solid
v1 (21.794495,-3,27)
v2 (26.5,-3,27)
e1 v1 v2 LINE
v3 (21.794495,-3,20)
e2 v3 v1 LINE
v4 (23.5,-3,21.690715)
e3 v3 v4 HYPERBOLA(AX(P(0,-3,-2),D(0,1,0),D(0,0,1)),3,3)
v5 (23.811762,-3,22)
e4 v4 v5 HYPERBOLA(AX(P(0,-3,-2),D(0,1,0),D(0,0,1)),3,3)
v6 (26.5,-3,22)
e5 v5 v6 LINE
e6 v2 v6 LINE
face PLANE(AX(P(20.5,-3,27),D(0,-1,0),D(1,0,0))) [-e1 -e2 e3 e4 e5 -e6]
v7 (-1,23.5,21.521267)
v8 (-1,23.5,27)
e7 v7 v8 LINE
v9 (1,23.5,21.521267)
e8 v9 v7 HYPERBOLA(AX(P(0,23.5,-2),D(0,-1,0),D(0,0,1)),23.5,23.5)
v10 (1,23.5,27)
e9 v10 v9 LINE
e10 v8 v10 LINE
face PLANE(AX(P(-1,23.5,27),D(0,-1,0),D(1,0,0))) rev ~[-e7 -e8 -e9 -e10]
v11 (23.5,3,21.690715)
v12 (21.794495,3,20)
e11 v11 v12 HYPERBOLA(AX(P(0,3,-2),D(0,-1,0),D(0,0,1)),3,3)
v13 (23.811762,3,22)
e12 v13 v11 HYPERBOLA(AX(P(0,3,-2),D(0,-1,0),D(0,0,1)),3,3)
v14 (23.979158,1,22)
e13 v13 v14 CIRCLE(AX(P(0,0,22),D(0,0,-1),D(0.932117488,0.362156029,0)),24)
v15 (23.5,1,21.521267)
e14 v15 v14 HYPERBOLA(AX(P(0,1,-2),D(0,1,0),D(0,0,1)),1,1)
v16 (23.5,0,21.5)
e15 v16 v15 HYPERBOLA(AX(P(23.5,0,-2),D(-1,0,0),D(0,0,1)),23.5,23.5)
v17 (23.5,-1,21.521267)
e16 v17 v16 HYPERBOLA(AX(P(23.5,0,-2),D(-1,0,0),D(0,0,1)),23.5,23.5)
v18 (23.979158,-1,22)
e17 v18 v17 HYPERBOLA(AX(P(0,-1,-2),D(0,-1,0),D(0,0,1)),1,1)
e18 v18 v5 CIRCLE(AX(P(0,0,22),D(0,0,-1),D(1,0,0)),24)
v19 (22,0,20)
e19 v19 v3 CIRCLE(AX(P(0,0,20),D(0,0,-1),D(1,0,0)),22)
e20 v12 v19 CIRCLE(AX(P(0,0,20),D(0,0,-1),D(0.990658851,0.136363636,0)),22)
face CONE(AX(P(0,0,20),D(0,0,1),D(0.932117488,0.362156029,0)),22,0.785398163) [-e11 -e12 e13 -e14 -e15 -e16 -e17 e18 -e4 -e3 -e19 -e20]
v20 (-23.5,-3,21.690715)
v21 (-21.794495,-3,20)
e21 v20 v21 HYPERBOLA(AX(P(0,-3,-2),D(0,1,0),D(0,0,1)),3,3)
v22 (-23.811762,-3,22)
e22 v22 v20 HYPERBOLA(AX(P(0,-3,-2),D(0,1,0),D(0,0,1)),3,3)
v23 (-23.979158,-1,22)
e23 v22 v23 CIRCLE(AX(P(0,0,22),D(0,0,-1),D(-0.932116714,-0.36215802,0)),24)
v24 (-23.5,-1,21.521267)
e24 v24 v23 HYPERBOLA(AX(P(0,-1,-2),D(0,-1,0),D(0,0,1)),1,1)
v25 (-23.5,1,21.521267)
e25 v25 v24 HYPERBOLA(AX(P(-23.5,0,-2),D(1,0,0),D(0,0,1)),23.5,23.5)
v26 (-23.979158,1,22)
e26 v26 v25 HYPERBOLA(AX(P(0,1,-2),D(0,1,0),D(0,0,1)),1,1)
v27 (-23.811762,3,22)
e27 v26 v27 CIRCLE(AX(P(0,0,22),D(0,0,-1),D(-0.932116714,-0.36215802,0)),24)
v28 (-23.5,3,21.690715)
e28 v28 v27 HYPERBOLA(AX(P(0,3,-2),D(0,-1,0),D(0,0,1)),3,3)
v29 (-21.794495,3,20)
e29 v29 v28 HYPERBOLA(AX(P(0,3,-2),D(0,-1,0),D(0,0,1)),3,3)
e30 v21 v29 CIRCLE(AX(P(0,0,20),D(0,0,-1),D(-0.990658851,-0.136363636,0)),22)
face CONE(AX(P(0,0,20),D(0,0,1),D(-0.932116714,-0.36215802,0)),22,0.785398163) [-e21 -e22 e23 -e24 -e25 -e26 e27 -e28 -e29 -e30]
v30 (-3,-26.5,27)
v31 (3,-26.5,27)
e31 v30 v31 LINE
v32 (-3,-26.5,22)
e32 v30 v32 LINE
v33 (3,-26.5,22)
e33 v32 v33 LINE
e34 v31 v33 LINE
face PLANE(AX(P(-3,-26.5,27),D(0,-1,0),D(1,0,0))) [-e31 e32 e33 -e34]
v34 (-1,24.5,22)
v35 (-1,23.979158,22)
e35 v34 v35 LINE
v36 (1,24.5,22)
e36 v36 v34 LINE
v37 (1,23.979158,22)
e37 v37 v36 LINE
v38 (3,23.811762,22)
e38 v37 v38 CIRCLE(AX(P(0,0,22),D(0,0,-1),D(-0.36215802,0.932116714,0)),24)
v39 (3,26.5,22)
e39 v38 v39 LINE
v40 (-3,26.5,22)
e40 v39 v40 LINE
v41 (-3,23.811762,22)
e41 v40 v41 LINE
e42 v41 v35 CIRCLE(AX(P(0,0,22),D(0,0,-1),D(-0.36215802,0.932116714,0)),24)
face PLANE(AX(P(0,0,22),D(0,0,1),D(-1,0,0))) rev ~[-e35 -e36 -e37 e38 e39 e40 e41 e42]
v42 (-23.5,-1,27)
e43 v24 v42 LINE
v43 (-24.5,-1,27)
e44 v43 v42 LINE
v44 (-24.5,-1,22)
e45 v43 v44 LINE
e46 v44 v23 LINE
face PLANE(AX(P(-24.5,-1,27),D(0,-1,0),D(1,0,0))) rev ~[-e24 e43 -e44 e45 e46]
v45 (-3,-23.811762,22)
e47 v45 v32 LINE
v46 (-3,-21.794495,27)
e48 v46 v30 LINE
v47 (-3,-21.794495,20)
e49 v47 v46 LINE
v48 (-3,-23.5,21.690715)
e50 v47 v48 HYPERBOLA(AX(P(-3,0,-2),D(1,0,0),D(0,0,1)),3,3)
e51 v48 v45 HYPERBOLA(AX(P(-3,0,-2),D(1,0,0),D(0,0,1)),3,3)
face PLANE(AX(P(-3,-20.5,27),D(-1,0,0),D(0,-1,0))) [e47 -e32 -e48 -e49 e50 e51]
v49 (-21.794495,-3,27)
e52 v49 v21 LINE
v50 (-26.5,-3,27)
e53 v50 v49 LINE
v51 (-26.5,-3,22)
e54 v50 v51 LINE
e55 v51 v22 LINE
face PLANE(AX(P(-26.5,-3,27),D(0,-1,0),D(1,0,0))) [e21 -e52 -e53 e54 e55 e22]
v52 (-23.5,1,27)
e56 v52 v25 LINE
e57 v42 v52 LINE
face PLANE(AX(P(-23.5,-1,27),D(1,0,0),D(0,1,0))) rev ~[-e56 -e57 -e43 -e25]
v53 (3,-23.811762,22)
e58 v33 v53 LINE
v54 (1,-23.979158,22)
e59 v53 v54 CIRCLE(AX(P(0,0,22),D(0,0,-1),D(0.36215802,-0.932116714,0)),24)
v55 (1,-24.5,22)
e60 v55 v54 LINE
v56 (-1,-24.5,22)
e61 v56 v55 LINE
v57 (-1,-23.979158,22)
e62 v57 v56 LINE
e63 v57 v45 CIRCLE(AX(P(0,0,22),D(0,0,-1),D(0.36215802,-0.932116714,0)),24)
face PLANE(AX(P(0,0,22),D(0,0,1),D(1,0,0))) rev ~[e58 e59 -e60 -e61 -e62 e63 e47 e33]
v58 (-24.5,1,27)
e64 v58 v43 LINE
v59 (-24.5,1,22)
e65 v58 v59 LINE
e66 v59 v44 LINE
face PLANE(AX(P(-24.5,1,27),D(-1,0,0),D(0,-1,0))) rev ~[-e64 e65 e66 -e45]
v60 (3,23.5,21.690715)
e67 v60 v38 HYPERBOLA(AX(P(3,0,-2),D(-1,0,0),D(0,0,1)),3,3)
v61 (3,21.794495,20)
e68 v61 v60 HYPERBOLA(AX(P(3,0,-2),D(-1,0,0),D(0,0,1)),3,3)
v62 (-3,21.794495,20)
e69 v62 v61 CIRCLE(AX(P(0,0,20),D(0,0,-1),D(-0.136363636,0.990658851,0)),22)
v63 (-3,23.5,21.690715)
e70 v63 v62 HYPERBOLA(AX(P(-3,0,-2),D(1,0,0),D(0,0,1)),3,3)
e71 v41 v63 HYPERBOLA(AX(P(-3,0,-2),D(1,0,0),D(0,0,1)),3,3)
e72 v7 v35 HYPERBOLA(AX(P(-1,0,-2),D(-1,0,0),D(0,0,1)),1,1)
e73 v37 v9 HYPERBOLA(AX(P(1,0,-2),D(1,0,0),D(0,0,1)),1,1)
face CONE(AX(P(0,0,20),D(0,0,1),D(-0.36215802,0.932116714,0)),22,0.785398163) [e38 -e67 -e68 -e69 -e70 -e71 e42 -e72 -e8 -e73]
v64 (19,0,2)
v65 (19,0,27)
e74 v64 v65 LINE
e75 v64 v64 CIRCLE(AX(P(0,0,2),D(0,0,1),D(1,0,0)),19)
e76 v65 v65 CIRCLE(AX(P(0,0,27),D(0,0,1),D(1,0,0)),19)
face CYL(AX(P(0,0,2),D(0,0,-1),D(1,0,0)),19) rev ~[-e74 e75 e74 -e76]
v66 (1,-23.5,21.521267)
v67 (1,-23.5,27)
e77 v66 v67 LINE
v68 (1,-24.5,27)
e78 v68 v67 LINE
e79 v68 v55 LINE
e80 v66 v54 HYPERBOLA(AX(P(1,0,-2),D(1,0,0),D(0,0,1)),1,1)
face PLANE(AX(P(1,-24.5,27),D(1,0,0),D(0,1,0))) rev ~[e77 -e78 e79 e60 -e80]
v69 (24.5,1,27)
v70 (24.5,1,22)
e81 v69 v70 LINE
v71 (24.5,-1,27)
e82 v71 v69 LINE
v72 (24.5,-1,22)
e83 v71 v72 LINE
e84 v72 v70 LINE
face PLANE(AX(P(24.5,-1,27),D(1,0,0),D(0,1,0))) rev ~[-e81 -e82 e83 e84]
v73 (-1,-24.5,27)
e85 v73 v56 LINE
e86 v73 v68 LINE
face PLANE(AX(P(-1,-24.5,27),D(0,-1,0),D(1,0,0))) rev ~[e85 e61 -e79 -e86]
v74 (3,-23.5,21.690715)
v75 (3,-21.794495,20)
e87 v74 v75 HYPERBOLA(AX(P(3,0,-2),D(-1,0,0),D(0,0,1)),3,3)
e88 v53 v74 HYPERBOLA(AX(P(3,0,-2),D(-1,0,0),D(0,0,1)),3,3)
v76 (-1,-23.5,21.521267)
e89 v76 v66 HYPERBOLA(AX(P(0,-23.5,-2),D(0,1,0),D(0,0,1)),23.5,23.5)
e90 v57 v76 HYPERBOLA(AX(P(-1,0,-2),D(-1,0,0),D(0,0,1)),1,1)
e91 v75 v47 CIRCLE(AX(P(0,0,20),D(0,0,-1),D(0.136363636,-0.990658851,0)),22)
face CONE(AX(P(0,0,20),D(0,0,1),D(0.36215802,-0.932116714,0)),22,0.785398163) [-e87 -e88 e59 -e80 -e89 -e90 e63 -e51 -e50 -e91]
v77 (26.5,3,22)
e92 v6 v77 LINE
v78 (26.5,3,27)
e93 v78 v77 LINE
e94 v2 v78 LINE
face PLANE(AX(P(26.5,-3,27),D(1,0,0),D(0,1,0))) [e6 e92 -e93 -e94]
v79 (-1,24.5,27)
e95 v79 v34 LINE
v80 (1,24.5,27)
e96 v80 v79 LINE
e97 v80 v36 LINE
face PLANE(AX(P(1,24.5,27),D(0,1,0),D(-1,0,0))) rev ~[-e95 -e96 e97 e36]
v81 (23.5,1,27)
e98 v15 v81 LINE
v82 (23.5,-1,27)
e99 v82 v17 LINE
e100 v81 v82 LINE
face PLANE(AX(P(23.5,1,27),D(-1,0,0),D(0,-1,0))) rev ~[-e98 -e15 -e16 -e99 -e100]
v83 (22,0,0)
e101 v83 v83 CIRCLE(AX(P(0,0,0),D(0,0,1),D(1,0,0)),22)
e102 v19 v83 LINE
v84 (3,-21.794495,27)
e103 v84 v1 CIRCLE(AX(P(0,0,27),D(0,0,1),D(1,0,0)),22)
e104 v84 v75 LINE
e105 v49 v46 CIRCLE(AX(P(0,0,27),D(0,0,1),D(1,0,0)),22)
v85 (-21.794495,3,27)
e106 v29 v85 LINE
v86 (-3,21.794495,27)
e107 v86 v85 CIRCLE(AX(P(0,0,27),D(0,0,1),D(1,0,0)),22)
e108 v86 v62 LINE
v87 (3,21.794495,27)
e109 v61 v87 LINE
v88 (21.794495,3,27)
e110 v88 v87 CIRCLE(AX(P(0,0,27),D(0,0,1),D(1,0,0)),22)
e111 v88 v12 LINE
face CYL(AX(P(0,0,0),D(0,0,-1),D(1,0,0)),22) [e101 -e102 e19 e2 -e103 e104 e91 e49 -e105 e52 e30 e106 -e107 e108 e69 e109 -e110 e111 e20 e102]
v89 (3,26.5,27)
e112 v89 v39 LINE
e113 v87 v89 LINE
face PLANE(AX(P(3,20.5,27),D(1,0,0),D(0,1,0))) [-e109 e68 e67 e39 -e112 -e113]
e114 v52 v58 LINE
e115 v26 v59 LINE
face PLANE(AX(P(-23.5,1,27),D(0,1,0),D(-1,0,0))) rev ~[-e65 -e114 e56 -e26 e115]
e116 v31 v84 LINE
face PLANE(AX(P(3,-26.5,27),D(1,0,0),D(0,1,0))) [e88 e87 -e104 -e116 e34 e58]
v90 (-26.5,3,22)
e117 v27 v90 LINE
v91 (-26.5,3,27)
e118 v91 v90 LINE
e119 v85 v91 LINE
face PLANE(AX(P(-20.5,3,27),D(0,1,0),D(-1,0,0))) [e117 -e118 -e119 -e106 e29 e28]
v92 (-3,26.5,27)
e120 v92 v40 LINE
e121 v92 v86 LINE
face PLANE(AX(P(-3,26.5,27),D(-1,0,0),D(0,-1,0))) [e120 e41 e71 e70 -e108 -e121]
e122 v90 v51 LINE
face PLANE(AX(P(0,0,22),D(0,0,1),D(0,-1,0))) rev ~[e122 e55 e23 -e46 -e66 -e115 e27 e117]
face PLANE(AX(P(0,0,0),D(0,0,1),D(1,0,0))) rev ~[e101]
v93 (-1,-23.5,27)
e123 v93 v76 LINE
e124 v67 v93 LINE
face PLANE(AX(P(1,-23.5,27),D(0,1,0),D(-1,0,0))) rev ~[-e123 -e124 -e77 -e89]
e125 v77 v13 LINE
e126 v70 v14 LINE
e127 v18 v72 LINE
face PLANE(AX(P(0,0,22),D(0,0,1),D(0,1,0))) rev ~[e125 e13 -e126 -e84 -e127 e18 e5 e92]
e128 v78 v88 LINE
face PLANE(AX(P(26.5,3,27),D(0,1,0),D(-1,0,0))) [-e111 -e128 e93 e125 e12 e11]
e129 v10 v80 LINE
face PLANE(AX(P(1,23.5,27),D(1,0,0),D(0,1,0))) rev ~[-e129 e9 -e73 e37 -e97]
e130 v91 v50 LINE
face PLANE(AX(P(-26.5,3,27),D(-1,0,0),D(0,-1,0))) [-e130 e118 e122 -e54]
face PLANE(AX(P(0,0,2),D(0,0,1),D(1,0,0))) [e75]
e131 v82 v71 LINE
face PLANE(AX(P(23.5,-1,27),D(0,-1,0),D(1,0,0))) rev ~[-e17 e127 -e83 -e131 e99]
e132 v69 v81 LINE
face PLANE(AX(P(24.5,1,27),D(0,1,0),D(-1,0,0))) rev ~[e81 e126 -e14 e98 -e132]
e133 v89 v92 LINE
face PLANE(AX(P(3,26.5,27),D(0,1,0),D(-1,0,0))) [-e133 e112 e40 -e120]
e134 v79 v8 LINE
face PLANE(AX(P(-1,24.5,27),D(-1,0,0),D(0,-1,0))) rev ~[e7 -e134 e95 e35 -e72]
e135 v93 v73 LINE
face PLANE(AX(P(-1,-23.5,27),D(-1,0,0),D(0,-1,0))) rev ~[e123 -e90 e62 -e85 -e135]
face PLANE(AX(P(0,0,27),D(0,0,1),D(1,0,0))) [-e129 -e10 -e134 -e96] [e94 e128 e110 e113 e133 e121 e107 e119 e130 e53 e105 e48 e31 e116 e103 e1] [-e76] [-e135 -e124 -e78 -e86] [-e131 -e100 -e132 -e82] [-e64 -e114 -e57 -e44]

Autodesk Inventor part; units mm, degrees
ref_plane "YZ Plane" through (0, 0, 0) normal (1, 0, 0) x (0, 1, 0)
ref_plane "XZ Plane" through (0, 0, 0) normal (0, 1, 0) x (-1, 0, 0)
ref_plane "XY Plane" through (0, 0, 0) normal (0, 0, 1) x (1, 0, 0)
sketch "스케치1" plane through (0, 0, 0) normal (0, 0, 1) x (1, 0, 0)
  circle A0 centre (0, 0) radius 22
  dimension "d0" = 44
extrude "돌출1" add sketch "스케치1" along normal blind 2
sketch "스케치2" plane through (0, 0, 2) normal (0, 0, 1) x (1, 0, 0)
  circle A0 centre (0, 0) radius 22
  circle A1 centre (0, 0) radius 19
  circle A2 centre (0, 0) radius 22 projected
  dimension "d7" = 38
extrude "돌출2" add sketch "스케치2" along normal blind 25
sketch "스케치3" plane through (0, 0, 27) normal (0, 0, 1) x (1, 0, 0)
  line L0 (-3, -26.5) -> (3, -26.5)
  line L1 (3, -26.5) -> (3, -20.5)
  line L2 (3, -20.5) -> (-3, -20.5)
  line L3 (-3, -20.5) -> (-3, -26.5)
  circle A0 centre (0, 0) radius 19 construction
  line L4 (0, -19) -> (0, -22) construction
  circle A1 centre (0, 0) radius 22 construction
  line L5 (-1, -24.5) -> (1, -24.5)
  line L6 (1, -24.5) -> (1, -23.5)
  line L7 (1, -23.5) -> (-1, -23.5)
  line L8 (-1, -23.5) -> (-1, -24.5)
  point P0 (0, -20.5)
  point P1 (0, -23.5)
  dimension "d8" = 6
  dimension "d9" = 6
  dimension "d10" = 2
  dimension "d11" = 2
  dimension "d12" = 1
extrude "돌출3" add sketch "스케치3" against normal blind 5
chamfer "모따기1" distance 2 angle 45 1 edges at (0, -22, 22)
pattern_circular "원형 패턴1" count 4 over 360 about axis through (0, 0, 2) along (0, 0, 1) of "돌출3", "모따기1"
properties part number "_3D 인쇄"
